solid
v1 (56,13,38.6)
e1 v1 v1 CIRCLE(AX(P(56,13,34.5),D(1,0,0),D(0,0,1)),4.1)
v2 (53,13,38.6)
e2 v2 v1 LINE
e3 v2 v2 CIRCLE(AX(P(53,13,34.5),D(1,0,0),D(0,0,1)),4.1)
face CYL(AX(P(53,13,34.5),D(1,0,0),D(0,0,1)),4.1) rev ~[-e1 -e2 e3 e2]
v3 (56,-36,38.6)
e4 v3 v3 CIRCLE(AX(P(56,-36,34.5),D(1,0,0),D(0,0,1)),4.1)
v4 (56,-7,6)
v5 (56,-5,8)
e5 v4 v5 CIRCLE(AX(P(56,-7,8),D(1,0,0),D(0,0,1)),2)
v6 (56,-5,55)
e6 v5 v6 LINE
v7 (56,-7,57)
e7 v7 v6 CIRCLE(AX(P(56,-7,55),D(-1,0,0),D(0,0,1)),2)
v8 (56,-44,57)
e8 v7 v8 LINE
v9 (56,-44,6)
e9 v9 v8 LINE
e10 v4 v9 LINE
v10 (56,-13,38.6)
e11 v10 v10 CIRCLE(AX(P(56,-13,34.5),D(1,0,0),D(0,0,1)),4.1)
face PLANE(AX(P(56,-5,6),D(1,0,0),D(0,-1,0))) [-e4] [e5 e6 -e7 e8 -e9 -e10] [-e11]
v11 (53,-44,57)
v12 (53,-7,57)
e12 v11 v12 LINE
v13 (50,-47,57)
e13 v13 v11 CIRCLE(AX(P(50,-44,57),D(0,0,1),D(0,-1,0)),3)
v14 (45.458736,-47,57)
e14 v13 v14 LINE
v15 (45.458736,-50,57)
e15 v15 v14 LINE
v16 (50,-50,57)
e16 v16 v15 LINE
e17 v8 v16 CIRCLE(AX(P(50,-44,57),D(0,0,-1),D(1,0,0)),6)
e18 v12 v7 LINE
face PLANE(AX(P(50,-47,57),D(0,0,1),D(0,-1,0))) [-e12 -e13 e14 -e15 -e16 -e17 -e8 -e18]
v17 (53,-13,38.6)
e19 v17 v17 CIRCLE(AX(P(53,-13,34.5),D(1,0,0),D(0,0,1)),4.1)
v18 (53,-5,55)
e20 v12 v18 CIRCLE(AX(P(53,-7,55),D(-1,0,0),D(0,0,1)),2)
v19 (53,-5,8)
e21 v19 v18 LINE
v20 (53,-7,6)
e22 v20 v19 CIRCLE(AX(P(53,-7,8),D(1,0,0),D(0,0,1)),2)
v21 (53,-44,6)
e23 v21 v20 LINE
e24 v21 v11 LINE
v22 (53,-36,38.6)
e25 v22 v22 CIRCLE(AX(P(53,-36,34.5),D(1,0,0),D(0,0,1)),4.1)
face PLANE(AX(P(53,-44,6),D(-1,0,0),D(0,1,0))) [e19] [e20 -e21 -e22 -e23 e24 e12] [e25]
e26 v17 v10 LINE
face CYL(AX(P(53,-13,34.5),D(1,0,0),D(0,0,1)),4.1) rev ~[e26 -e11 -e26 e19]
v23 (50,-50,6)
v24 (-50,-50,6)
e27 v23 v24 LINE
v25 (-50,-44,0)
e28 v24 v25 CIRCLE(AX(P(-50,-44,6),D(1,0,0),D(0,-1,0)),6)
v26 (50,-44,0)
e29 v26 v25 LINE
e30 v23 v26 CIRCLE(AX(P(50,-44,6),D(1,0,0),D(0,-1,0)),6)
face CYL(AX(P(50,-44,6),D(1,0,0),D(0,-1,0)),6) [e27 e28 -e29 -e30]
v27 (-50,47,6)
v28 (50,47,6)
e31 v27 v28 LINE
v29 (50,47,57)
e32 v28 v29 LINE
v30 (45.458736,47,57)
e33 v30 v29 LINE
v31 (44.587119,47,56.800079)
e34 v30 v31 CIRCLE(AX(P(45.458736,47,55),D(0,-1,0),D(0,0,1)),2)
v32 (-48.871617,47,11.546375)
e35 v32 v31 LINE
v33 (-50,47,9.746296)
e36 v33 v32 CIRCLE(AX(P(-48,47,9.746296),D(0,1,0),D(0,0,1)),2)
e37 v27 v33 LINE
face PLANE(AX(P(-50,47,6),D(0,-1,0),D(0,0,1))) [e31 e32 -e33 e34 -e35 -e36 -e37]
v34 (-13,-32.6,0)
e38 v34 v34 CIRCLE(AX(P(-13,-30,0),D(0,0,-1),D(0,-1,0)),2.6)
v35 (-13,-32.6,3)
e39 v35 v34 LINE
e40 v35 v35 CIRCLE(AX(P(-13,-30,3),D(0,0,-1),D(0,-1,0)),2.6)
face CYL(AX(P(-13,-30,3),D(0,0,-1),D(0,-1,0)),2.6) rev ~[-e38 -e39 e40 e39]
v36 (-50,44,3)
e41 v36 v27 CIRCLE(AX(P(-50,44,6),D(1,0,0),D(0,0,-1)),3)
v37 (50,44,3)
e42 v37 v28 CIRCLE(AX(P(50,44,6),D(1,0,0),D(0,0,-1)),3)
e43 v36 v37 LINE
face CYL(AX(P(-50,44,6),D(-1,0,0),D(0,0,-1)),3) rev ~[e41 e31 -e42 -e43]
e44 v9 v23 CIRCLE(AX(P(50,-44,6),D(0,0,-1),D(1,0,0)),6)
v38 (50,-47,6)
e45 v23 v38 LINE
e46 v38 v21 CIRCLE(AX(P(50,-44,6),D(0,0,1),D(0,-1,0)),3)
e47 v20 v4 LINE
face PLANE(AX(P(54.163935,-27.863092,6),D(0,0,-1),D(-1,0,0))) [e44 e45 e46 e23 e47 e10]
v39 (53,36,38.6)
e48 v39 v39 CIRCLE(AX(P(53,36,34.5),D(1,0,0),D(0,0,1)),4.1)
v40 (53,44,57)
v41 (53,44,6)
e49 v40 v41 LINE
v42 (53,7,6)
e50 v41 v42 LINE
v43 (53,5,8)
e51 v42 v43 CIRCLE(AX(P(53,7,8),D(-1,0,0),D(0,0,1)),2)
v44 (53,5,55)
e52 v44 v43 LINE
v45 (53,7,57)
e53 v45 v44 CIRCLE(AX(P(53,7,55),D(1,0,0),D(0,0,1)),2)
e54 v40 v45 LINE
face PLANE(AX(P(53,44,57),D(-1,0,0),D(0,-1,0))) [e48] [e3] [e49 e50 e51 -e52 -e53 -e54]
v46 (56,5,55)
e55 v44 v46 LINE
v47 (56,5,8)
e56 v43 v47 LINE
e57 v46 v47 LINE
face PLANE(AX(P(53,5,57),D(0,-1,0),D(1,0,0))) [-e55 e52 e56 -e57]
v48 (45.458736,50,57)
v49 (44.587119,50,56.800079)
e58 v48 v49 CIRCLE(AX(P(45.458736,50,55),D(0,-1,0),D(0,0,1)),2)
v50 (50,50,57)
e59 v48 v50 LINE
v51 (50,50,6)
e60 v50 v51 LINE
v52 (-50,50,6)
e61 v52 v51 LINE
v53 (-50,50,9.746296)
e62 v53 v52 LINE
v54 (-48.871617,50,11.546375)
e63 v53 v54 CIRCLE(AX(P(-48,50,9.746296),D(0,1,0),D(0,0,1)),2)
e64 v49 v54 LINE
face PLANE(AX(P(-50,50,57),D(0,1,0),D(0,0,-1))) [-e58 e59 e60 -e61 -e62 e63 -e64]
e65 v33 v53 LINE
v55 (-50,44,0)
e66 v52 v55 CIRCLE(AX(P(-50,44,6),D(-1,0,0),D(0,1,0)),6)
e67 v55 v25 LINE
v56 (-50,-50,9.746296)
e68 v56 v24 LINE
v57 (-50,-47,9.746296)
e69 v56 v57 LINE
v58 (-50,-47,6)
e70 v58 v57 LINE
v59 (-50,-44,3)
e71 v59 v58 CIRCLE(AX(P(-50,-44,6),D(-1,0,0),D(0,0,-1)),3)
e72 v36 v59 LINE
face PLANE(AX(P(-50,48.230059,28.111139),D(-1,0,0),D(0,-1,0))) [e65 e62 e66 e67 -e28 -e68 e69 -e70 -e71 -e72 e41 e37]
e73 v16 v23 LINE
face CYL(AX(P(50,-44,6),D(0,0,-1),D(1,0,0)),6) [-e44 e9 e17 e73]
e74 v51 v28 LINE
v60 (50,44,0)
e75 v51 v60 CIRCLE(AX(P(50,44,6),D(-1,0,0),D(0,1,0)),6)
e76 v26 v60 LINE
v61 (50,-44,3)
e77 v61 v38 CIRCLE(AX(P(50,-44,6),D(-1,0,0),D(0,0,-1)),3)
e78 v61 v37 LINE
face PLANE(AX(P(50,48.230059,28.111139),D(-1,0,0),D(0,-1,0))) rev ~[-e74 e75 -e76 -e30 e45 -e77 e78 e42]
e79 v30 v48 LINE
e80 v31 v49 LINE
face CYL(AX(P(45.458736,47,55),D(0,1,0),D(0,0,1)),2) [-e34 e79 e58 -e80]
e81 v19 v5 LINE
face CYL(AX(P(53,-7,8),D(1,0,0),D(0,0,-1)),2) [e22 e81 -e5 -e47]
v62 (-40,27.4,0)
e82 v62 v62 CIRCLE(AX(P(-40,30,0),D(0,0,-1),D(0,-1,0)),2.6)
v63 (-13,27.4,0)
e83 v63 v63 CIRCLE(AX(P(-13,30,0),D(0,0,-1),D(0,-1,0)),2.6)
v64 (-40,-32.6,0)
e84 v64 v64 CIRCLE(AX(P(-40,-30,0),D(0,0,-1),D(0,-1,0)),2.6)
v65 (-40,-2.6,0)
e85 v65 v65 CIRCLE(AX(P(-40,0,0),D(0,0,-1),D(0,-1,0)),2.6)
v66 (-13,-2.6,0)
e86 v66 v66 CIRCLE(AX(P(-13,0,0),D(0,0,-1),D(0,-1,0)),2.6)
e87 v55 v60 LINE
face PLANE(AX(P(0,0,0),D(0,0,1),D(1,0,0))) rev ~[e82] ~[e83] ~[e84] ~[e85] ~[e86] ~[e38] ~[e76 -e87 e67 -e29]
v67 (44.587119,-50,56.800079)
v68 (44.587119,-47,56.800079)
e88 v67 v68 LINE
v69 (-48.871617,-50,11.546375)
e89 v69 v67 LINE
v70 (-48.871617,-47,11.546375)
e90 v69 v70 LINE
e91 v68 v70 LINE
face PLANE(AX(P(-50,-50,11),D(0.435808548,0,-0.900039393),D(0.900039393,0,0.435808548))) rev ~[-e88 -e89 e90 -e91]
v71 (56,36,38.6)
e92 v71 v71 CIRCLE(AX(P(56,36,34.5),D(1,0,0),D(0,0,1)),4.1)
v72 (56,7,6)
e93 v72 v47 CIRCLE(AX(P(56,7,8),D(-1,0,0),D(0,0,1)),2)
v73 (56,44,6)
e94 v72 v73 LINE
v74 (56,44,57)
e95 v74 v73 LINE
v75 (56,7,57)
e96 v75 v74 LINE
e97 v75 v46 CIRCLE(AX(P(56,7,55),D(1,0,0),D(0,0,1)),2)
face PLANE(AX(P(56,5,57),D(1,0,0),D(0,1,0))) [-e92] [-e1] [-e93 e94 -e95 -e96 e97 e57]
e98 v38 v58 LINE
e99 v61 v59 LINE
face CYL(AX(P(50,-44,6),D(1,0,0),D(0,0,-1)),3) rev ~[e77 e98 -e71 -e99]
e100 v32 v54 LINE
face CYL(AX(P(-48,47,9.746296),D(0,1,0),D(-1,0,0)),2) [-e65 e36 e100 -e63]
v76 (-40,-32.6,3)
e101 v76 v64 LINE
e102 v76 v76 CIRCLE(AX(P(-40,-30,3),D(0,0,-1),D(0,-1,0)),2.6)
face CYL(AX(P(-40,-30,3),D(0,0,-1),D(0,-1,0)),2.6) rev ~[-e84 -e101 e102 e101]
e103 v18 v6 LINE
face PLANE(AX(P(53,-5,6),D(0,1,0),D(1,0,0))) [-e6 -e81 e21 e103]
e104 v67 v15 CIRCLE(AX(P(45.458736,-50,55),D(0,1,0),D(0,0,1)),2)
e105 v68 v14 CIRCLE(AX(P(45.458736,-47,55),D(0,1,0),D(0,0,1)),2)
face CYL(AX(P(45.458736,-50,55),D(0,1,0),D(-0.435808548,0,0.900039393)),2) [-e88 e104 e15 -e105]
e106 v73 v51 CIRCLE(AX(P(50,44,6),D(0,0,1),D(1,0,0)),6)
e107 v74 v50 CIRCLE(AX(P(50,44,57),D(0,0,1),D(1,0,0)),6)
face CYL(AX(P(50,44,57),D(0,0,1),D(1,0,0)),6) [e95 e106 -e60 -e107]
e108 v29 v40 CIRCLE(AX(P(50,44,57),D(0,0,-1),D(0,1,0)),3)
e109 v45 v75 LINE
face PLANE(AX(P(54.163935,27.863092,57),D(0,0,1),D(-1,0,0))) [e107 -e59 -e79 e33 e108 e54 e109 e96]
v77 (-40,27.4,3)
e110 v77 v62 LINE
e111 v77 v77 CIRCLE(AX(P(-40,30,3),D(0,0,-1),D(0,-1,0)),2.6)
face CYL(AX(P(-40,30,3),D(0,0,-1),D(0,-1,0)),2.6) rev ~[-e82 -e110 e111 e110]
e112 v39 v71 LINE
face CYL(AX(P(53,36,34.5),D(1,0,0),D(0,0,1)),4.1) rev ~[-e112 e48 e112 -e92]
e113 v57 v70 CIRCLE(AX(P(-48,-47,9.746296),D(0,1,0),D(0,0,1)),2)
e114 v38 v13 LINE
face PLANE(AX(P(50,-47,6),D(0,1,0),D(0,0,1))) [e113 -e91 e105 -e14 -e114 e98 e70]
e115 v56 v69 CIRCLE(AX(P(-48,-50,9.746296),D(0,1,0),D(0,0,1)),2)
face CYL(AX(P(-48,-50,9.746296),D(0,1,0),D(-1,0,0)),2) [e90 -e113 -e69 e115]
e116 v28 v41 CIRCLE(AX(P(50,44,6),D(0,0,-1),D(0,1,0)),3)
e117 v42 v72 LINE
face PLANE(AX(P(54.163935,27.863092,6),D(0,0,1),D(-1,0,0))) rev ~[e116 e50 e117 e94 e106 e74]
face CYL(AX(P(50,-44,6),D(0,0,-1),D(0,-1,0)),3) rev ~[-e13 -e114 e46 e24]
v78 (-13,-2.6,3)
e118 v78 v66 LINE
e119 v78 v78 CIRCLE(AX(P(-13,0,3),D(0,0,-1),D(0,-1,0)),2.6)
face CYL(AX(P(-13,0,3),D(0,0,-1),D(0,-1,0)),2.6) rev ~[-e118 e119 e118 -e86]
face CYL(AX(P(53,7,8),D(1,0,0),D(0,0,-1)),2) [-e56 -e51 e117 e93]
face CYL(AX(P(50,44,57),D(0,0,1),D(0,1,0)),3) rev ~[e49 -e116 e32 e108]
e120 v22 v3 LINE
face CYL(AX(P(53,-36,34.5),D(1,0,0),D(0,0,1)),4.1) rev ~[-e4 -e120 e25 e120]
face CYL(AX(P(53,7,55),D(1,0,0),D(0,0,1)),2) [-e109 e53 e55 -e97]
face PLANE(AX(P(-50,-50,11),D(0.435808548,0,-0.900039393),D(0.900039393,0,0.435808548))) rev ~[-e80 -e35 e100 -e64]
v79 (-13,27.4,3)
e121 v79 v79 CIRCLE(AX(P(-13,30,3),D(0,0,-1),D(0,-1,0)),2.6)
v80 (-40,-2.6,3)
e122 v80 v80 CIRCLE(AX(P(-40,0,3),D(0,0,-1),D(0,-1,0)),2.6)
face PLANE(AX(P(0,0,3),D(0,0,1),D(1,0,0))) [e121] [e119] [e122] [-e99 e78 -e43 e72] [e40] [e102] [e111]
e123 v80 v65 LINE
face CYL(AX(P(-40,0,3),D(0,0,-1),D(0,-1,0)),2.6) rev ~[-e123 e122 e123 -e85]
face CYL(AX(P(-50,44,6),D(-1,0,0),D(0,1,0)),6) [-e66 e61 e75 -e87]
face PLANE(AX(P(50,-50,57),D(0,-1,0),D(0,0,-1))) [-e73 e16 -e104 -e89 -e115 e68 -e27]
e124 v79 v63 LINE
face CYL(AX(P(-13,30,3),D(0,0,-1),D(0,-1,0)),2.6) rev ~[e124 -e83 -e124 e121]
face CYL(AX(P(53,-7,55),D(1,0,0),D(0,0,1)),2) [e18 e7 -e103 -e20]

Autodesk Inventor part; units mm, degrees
ref_plane "YZ Plane" through (0, 0, 0) normal (1, 0, 0) x (0, 1, 0)
ref_plane "XZ Plane" through (0, 0, 0) normal (0, 1, 0) x (-1, 0, 0)
ref_plane "XY Plane" through (0, 0, 0) normal (0, 0, 1) x (1, 0, 0)
sketch "スケッチ1" plane through (0, 0, 0) normal (0, 0, 1) x (1, 0, 0)
  line L0 (-50, -50) -> (50, -50)
  line L1 (50, -50) -> (50, 50)
  line L2 (50, 50) -> (-50, 50)
  line L3 (-50, 50) -> (-50, -50)
  line L4 (-50, -50) -> (50, 50) construction
  line L5 (50, -50) -> (-50, 50) construction
  point P0 (0, 0)
  dimension "d0" = 100
  dimension "d1" = 100
extrude "プレート1" add sketch "スケッチ1" along normal blind 3
sketch "スケッチ2" plane through (-50, 47, 0) normal (0, 1, 0) x (-1, 0, 0)
  line L0 (-100, 0) -> (0, 0)
  line L1 (0, 0) -> (0, 57)
  line L2 (0, 57) -> (-100, 57)
  line L3 (-100, 57) -> (-100, 0)
edge flange "フランジ1" height 57 angle 90 thickness 3 bend radius 3 thickness toward (0, 1, 0) relief tear relief width 3 relief depth 1.5 corner gap 3 corner form 0 edges at (0, 50, 3) (0, -50, 3) wall of the first edge with corners at (50, 47, 0) (-50, 47, 0) (-50, 47, 57) (50, 47, 57)
bend "曲げ1"
corner "コーナー1"
sketch "スケッチ3" plane through (53, 44, 57) normal (1, 0, 0) x (0, 1, 0)
  line L0 (0, -51) -> (0, 0)
  line L1 (0, 0) -> (-39, 0)
  line L2 (-39, 0) -> (-39, -51)
  line L3 (-39, -51) -> (0, -51)
edge flange "フランジ2" height 45 angle 90 thickness 3 bend radius 3 thickness toward (1, 0, 0) relief tear relief width 3 relief depth 1.5 corner gap 3 corner form 0 edges at (50, 47, 31.5) (50, -47, 31.5) wall of the first edge with corners at (53, 44, 6) (53, 44, 57) (53, 5, 57) (53, 5, 6)
bend "曲げ2"
corner "コーナー2"
sketch "スケッチ4" plane through (-50, -50, 6) normal (0, -1, 0) x (1, 0, 0)
  line L0 (0, 0) -> (0, 51) projected
  line L1 (0, 5) -> (95, 51)
  line L2 (0, 51) -> (100, 51) projected
  line L3 (0, 0) -> (100, 0) projected
  line L4 (100, 51) -> (100, 0) projected
  point P0 (50, -6)
  dimension "d23" = 5
  dimension "d24" = 5
extrude "押し出し1" cut sketch "スケッチ4" against normal through all contours L0 L2 L1
fillet "フィレット1" radius 2 8 edges at (-50, 48.5, 11) (-50, -48.5, 11) (45, 48.5, 57) (45, -48.5, 57) (54.5, 5, 57) (54.5, -5, 6) (54.5, 5, 6) (54.5, -5, 57)
sketch "スケッチ5" plane through (0, 0, 3) normal (0, 0, 1) x (1, 0, 0)
  line L0 (-40, -30) -> (-13, -30)
  line L1 (-13, -30) -> (-13, 30)
  line L2 (-13, 30) -> (-40, 30)
  line L3 (-40, 30) -> (-40, -30)
  line L4 (-40, -30) -> (-13, 30) construction
  line L5 (-13, -30) -> (-40, 30) construction
  line L6 (-50, -44) -> (-50, 44) projected
  point P0 (0, 0)
  point P1 (-26.5, 0)
  point P2 (-26.5, 0)
  point P3 (-40, 0)
  point P4 (-13, 0)
  dimension "d28" = 27
  dimension "d29" = 10
  dimension "d30" = 60
hole "穴1" at (-40, 0, 3) at (-13, 0, 3) at (-40, -30, 3) at (-40, 30, 3) at (-13, -30, 3) at (-13, 30, 3) direction (0, 0, -1) diameter 5.2 end through all
sketch "スケッチ6" plane through (53, 44, 6) normal (-1, 0, 0) x (0, 0, 1)
  arc A0 (0, -37) -> (2, -39) centre (2, -37) ccw projected
  line L0 (2, -39) -> (49, -39) projected
  arc A1 (49, -39) -> (51, -37) centre (49, -37) ccw projected
  line L1 (51, -37) -> (51, 0) projected
  line L2 (51, 0) -> (0, 0) projected
  line L3 (0, -37) -> (0, 0) projected
  arc A2 (2, -49) -> (0, -51) centre (2, -51) ccw projected
  line L4 (0, -51) -> (0, -88) projected
  line L5 (0, -88) -> (51, -88) projected
  line L6 (51, -51) -> (51, -88) projected
  arc A3 (51, -51) -> (49, -49) centre (49, -51) ccw projected
  line L7 (49, -49) -> (2, -49) projected
  point P0 (-6, -44)
  point P1 (28.5, -8)
  point P2 (28.5, -31)
  point P3 (28.5, -57)
  point P4 (28.5, -80)
  dimension "d38" = 22.5
  dimension "d39" = 8
  dimension "d40" = 8
  dimension "d41" = 8
  dimension "d42" = 8
hole "穴2" at (53, 36, 34.5) at (53, 13, 34.5) at (53, -13, 34.5) at (53, -36, 34.5) direction (1, 0, 0) diameter 8.2 end through all
equation "\"d36\" = Thickness"
equation "\"d48\" = Thickness"
equation "\"d2\" = Thickness"
equation "\"d3\" = BendReliefWidth"
equation "\"d4\" = BendReliefDepth"
equation "\"d5\" = MinimumRemnant"
equation "\"d6\" = TransitionRadius"
equation "\"d9\" = BendRadius"
equation "\"d10\" = CornerReliefSize"
equation "\"d11\" = GapSize"
equation "\"d12\" = JacobiRadiusSize"
equation "\"d13\" = BendReliefWidth"
equation "\"d14\" = BendReliefDepth"
equation "\"d15\" = MinimumRemnant"
equation "\"d16\" = TransitionRadius"
equation "\"d19\" = BendRadius"
equation "\"d20\" = CornerReliefSize"
equation "\"d21\" = GapSize"
equation "\"d22\" = JacobiRadiusSize"
equation "\"BendRadius\" = Thickness"
equation "\"BendReliefWidth\" = Thickness"
equation "\"BendReliefDepth\" = 0.5 * Thickness"
equation "\"CornerReliefSize\" = 4 * Thickness"
equation "\"MinimumRemnant\" = 2 * Thickness"
equation "\"TransitionRadius\" = BendRadius"
equation "\"JacobiRadiusSize\" = BendRadius"
equation "\"GapSize\" = Thickness"
equation "\"Thickness\" = 3"
properties part number "CCM_Mount_A"
